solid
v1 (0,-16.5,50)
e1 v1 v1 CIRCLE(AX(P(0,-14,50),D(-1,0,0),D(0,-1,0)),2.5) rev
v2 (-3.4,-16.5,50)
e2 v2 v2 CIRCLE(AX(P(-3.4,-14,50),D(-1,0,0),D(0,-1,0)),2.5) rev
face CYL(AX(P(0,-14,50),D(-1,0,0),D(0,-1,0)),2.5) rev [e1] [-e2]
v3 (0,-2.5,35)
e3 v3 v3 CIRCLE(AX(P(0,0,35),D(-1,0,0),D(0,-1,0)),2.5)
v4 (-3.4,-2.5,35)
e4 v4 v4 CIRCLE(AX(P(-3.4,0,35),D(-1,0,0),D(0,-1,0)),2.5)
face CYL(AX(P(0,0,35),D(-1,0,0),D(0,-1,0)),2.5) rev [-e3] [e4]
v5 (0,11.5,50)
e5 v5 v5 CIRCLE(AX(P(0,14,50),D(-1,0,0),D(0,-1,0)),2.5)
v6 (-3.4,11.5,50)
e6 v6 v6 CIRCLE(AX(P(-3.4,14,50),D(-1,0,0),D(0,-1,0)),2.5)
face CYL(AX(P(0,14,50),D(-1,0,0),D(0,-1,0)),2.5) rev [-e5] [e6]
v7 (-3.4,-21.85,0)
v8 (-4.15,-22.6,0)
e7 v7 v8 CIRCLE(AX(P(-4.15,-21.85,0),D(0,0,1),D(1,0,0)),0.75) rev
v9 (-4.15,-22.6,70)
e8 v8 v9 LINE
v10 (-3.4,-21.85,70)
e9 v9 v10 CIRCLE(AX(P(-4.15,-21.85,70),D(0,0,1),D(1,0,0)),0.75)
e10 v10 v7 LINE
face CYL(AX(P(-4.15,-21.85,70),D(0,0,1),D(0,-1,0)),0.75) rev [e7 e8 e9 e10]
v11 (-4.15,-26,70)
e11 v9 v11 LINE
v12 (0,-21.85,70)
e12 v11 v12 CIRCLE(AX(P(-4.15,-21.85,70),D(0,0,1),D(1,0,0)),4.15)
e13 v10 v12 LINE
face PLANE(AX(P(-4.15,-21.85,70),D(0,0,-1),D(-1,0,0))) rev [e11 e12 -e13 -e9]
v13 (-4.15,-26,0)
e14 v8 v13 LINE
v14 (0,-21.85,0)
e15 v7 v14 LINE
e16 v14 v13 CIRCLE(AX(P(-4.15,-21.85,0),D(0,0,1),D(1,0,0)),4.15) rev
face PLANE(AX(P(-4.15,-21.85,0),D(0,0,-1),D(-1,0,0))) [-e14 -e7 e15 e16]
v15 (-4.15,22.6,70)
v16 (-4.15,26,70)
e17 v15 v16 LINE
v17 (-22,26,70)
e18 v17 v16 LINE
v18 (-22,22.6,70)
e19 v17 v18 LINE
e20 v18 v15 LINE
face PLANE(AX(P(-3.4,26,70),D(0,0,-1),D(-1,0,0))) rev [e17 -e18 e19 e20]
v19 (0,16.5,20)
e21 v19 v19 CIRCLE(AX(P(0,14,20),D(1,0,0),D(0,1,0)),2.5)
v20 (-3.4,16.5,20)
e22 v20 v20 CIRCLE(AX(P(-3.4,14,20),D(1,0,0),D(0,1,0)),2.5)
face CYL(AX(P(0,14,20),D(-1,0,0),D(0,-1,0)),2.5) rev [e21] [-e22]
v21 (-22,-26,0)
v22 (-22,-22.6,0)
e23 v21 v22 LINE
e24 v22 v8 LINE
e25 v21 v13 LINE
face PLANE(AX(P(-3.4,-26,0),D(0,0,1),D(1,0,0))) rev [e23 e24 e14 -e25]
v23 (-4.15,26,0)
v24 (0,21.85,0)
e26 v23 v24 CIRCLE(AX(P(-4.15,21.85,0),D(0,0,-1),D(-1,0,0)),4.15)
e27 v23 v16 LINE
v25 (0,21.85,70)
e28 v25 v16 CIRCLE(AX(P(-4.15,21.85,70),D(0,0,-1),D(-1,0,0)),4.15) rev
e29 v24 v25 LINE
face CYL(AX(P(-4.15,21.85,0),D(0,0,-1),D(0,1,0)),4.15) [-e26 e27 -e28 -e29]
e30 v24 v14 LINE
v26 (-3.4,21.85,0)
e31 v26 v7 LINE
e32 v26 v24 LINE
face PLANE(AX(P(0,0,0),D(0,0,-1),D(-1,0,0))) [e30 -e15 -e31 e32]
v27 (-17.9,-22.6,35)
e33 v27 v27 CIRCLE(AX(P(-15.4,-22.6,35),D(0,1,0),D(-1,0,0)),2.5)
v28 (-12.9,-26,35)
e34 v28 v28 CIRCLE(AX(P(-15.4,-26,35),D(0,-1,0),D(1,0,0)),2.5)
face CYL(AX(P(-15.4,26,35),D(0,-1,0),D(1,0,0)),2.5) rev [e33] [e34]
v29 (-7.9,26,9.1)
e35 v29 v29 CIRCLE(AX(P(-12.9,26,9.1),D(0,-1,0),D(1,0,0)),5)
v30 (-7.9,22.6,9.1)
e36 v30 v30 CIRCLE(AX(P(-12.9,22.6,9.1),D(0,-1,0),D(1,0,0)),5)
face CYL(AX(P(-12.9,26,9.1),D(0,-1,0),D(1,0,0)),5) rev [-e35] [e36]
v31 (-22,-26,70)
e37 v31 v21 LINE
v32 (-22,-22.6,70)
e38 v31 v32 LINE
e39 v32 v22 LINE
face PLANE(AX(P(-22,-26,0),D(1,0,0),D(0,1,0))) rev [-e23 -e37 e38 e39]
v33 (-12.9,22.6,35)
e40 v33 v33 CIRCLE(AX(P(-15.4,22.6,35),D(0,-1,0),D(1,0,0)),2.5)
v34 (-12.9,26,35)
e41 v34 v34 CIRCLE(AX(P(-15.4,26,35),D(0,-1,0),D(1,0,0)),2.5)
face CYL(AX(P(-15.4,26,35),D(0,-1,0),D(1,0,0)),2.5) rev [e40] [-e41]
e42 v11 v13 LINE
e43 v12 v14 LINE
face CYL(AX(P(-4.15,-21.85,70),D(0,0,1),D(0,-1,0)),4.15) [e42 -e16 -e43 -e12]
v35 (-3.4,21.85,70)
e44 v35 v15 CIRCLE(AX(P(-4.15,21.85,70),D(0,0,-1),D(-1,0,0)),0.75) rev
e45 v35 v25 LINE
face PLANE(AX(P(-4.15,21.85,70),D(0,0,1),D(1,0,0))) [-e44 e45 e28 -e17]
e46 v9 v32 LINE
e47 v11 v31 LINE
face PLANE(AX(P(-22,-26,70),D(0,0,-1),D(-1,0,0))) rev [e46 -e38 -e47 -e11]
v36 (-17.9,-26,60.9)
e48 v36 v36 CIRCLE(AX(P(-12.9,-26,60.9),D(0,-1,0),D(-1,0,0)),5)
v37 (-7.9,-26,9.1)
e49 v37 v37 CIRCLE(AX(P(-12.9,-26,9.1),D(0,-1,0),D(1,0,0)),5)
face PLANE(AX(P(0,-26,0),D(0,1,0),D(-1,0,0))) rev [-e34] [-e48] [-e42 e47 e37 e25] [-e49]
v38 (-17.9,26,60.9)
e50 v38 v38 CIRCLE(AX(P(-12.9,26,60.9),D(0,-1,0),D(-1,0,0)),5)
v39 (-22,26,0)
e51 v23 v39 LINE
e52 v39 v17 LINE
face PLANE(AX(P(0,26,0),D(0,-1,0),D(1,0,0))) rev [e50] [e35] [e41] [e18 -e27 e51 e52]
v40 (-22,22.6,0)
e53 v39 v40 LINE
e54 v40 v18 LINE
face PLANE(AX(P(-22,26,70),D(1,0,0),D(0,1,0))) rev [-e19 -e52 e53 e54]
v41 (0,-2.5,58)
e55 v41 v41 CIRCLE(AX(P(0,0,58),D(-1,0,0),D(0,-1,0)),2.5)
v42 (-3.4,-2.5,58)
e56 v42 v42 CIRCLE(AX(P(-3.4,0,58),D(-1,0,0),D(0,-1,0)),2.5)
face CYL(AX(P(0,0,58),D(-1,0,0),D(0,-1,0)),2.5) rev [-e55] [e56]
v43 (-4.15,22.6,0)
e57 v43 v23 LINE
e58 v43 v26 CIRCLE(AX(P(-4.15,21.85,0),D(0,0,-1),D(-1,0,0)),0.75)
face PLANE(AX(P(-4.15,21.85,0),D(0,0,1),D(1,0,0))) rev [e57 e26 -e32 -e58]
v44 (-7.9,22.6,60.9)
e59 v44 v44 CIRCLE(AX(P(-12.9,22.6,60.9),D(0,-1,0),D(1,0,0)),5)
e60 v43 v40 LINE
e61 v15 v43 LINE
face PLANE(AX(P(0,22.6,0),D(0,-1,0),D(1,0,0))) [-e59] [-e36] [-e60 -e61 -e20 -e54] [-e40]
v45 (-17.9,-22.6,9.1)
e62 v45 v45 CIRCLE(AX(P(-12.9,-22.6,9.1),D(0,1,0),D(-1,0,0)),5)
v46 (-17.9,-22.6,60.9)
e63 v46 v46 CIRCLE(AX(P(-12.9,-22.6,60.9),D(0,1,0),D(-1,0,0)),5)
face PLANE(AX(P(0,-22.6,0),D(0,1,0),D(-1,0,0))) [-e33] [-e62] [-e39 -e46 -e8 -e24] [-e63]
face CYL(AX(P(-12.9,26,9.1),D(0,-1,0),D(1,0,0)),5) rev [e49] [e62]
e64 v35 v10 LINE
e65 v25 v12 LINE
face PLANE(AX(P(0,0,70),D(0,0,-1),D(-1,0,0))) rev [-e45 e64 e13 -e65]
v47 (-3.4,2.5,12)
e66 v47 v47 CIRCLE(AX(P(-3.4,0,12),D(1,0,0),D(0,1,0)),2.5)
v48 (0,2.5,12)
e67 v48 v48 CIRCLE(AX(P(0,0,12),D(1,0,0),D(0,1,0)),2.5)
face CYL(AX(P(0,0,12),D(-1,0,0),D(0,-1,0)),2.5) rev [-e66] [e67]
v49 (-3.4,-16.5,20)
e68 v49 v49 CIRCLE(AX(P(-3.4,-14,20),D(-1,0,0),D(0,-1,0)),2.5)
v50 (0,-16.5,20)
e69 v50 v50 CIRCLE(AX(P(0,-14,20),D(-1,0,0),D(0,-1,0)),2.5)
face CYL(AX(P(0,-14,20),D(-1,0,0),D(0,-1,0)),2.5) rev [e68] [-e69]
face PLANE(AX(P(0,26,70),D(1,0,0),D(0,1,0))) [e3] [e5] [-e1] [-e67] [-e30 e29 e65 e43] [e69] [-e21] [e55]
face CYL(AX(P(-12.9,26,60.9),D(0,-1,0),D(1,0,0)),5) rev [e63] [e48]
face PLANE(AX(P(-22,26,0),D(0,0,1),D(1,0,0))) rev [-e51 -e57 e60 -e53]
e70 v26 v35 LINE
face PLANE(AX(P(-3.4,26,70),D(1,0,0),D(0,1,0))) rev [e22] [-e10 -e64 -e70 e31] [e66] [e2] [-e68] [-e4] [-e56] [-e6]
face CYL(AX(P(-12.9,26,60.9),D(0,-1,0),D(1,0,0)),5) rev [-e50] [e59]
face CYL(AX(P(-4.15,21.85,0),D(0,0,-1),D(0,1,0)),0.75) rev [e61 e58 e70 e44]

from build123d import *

# Parameters (mm, degrees)
SKETCH11_W                     = 3.4
SKETCH11_H                     = 52
BASE_FLANGE3_DEPTH             = 70
EDGE_FLANGE1_STRIP_W           = 15.1
EDGE_FLANGE1_STRIP_H           = 3.4
EDGE_FLANGE1_STRIP_CUT_DEPTH   = 70
EDGE_FLANGE1_STRIP_2_W         = 15.1
EDGE_FLANGE1_STRIP_2_H         = 3.4
EDGE_FLANGE1_STRIP_CUT_2_DEPTH = 70
EDGE_FLANGE1_DEPTH             = 70
EDGE_FLANGE1_BEND_DEPTH        = 70
CUT_EXTRUDE1_DEPTH             = 89.011135659
CUT_EXTRUDE1_DEPTH_BACK        = 89.011135659
SKETCH25_R                     = 2.5
SKETCH25_R_2                   = 5
SKETCH23_R                     = 2.5
CUT_EXTRUDE2_DEPTH             = 77.954272136


# Sheet-metal steps are written as plain solids
with BuildPart() as part:
    # Sketch11 → Base-Flange3 (new body)
    with BuildSketch(Plane.XY):
        with Locations((-1.7, 0)):
            Rectangle(SKETCH11_W, SKETCH11_H)
    extrude(amount=BASE_FLANGE3_DEPTH)

    # Edge-Flange1 strip (across the edge) → Edge-Flange1 strip cut (cut)
    with BuildSketch(Plane(origin=(-3.4, 26, 70), x_dir=(0, -1, 0), z_dir=(0, 0, -1))):
        with Locations((-3.4, -1.7)):
            Rectangle(EDGE_FLANGE1_STRIP_W, EDGE_FLANGE1_STRIP_H)
    extrude(amount=EDGE_FLANGE1_STRIP_CUT_DEPTH, mode=Mode.SUBTRACT)

    # Edge-Flange1 strip 2 (across the edge) → Edge-Flange1 strip cut 2 (cut)
    with BuildSketch(Plane(origin=(-3.4, -26, 0), x_dir=(0, 1, 0), z_dir=(0, 0, 1))):
        with Locations((-3.4, -1.7)):
            Rectangle(EDGE_FLANGE1_STRIP_2_W, EDGE_FLANGE1_STRIP_2_H)
    extrude(amount=EDGE_FLANGE1_STRIP_CUT_2_DEPTH, mode=Mode.SUBTRACT)

    # Edge-Flange1 section (across the edge) → Edge-Flange1 (add)
    with BuildSketch(Plane(origin=(-3.4, 26, 70), x_dir=(0, -1, 0), z_dir=(0, 0, -1))):
        with BuildLine():
            Line((0, 0.75), (0, 18.6))
            Line((0, 18.6), (3.4, 18.6))
            Line((3.4, 18.6), (3.4, 0.75))
            ThreePointArc((3.4, 0.75), (3.619669914, 0.219669914), (4.15, 0))
            Line((4.15, 0), (4.15, -3.4))
            ThreePointArc((4.15, -3.4), (1.215506858, -2.184493142), (0, 0.75))
        make_face()
    extrude(amount=EDGE_FLANGE1_DEPTH)

    # Edge-Flange1 section 2 (across the edge) → Edge-Flange1 bend (add)
    with BuildSketch(Plane(origin=(-3.4, -26, 0), x_dir=(0, 1, 0), z_dir=(0, 0, 1))):
        with BuildLine():
            Line((0, 0.75), (0, 18.6))
            Line((0, 18.6), (3.4, 18.6))
            Line((3.4, 18.6), (3.4, 0.75))
            ThreePointArc((3.4, 0.75), (3.619669914, 0.219669914), (4.15, 0))
            Line((4.15, 0), (4.15, -3.4))
            ThreePointArc((4.15, -3.4), (1.215506858, -2.184493142), (0, 0.75))
        make_face()
    extrude(amount=EDGE_FLANGE1_BEND_DEPTH)

    # Sketch25 → Cut-Extrude1 (cut, two sides: drawn at the far end of the back side and taken through both)
    with BuildSketch(Plane.XZ.offset(-22.6).offset(-CUT_EXTRUDE1_DEPTH_BACK)):
        with Locations((-15.4, 35)):
            Circle(SKETCH25_R)
        with Locations((-12.9, 9.1)):
            Circle(SKETCH25_R_2)
        with Locations(Location((-12.9, 60.9, 0), (0, 0, 180))):
            Circle(SKETCH25_R_2)
    extrude(amount=CUT_EXTRUDE1_DEPTH + CUT_EXTRUDE1_DEPTH_BACK, mode=Mode.SUBTRACT)

    # Sketch23 → Cut-Extrude2 (cut, through all)
    with BuildSketch(Plane.ZY.offset(3.4)):
        with Locations(Location((20, -14, 0), (0, 0, 270))):
            Circle(SKETCH23_R)
        with Locations(Location((50, -14, 0), (0, 0, 270))):
            Circle(SKETCH23_R)
        with Locations(Location((20, 14, 0), (0, 0, 90))):
            Circle(SKETCH23_R)
        with Locations(Location((50, 14, 0), (0, 0, 270))):
            Circle(SKETCH23_R)
        with Locations(Location((35, 0, 0), (0, 0, 270))):
            Circle(SKETCH23_R)
        with Locations(Location((58, 0, 0), (0, 0, 270))):
            Circle(SKETCH23_R)
        with Locations(Location((12, 0, 0), (0, 0, 90))):
            Circle(SKETCH23_R)
    extrude(amount=-CUT_EXTRUDE2_DEPTH, mode=Mode.SUBTRACT)


solid = part.part
